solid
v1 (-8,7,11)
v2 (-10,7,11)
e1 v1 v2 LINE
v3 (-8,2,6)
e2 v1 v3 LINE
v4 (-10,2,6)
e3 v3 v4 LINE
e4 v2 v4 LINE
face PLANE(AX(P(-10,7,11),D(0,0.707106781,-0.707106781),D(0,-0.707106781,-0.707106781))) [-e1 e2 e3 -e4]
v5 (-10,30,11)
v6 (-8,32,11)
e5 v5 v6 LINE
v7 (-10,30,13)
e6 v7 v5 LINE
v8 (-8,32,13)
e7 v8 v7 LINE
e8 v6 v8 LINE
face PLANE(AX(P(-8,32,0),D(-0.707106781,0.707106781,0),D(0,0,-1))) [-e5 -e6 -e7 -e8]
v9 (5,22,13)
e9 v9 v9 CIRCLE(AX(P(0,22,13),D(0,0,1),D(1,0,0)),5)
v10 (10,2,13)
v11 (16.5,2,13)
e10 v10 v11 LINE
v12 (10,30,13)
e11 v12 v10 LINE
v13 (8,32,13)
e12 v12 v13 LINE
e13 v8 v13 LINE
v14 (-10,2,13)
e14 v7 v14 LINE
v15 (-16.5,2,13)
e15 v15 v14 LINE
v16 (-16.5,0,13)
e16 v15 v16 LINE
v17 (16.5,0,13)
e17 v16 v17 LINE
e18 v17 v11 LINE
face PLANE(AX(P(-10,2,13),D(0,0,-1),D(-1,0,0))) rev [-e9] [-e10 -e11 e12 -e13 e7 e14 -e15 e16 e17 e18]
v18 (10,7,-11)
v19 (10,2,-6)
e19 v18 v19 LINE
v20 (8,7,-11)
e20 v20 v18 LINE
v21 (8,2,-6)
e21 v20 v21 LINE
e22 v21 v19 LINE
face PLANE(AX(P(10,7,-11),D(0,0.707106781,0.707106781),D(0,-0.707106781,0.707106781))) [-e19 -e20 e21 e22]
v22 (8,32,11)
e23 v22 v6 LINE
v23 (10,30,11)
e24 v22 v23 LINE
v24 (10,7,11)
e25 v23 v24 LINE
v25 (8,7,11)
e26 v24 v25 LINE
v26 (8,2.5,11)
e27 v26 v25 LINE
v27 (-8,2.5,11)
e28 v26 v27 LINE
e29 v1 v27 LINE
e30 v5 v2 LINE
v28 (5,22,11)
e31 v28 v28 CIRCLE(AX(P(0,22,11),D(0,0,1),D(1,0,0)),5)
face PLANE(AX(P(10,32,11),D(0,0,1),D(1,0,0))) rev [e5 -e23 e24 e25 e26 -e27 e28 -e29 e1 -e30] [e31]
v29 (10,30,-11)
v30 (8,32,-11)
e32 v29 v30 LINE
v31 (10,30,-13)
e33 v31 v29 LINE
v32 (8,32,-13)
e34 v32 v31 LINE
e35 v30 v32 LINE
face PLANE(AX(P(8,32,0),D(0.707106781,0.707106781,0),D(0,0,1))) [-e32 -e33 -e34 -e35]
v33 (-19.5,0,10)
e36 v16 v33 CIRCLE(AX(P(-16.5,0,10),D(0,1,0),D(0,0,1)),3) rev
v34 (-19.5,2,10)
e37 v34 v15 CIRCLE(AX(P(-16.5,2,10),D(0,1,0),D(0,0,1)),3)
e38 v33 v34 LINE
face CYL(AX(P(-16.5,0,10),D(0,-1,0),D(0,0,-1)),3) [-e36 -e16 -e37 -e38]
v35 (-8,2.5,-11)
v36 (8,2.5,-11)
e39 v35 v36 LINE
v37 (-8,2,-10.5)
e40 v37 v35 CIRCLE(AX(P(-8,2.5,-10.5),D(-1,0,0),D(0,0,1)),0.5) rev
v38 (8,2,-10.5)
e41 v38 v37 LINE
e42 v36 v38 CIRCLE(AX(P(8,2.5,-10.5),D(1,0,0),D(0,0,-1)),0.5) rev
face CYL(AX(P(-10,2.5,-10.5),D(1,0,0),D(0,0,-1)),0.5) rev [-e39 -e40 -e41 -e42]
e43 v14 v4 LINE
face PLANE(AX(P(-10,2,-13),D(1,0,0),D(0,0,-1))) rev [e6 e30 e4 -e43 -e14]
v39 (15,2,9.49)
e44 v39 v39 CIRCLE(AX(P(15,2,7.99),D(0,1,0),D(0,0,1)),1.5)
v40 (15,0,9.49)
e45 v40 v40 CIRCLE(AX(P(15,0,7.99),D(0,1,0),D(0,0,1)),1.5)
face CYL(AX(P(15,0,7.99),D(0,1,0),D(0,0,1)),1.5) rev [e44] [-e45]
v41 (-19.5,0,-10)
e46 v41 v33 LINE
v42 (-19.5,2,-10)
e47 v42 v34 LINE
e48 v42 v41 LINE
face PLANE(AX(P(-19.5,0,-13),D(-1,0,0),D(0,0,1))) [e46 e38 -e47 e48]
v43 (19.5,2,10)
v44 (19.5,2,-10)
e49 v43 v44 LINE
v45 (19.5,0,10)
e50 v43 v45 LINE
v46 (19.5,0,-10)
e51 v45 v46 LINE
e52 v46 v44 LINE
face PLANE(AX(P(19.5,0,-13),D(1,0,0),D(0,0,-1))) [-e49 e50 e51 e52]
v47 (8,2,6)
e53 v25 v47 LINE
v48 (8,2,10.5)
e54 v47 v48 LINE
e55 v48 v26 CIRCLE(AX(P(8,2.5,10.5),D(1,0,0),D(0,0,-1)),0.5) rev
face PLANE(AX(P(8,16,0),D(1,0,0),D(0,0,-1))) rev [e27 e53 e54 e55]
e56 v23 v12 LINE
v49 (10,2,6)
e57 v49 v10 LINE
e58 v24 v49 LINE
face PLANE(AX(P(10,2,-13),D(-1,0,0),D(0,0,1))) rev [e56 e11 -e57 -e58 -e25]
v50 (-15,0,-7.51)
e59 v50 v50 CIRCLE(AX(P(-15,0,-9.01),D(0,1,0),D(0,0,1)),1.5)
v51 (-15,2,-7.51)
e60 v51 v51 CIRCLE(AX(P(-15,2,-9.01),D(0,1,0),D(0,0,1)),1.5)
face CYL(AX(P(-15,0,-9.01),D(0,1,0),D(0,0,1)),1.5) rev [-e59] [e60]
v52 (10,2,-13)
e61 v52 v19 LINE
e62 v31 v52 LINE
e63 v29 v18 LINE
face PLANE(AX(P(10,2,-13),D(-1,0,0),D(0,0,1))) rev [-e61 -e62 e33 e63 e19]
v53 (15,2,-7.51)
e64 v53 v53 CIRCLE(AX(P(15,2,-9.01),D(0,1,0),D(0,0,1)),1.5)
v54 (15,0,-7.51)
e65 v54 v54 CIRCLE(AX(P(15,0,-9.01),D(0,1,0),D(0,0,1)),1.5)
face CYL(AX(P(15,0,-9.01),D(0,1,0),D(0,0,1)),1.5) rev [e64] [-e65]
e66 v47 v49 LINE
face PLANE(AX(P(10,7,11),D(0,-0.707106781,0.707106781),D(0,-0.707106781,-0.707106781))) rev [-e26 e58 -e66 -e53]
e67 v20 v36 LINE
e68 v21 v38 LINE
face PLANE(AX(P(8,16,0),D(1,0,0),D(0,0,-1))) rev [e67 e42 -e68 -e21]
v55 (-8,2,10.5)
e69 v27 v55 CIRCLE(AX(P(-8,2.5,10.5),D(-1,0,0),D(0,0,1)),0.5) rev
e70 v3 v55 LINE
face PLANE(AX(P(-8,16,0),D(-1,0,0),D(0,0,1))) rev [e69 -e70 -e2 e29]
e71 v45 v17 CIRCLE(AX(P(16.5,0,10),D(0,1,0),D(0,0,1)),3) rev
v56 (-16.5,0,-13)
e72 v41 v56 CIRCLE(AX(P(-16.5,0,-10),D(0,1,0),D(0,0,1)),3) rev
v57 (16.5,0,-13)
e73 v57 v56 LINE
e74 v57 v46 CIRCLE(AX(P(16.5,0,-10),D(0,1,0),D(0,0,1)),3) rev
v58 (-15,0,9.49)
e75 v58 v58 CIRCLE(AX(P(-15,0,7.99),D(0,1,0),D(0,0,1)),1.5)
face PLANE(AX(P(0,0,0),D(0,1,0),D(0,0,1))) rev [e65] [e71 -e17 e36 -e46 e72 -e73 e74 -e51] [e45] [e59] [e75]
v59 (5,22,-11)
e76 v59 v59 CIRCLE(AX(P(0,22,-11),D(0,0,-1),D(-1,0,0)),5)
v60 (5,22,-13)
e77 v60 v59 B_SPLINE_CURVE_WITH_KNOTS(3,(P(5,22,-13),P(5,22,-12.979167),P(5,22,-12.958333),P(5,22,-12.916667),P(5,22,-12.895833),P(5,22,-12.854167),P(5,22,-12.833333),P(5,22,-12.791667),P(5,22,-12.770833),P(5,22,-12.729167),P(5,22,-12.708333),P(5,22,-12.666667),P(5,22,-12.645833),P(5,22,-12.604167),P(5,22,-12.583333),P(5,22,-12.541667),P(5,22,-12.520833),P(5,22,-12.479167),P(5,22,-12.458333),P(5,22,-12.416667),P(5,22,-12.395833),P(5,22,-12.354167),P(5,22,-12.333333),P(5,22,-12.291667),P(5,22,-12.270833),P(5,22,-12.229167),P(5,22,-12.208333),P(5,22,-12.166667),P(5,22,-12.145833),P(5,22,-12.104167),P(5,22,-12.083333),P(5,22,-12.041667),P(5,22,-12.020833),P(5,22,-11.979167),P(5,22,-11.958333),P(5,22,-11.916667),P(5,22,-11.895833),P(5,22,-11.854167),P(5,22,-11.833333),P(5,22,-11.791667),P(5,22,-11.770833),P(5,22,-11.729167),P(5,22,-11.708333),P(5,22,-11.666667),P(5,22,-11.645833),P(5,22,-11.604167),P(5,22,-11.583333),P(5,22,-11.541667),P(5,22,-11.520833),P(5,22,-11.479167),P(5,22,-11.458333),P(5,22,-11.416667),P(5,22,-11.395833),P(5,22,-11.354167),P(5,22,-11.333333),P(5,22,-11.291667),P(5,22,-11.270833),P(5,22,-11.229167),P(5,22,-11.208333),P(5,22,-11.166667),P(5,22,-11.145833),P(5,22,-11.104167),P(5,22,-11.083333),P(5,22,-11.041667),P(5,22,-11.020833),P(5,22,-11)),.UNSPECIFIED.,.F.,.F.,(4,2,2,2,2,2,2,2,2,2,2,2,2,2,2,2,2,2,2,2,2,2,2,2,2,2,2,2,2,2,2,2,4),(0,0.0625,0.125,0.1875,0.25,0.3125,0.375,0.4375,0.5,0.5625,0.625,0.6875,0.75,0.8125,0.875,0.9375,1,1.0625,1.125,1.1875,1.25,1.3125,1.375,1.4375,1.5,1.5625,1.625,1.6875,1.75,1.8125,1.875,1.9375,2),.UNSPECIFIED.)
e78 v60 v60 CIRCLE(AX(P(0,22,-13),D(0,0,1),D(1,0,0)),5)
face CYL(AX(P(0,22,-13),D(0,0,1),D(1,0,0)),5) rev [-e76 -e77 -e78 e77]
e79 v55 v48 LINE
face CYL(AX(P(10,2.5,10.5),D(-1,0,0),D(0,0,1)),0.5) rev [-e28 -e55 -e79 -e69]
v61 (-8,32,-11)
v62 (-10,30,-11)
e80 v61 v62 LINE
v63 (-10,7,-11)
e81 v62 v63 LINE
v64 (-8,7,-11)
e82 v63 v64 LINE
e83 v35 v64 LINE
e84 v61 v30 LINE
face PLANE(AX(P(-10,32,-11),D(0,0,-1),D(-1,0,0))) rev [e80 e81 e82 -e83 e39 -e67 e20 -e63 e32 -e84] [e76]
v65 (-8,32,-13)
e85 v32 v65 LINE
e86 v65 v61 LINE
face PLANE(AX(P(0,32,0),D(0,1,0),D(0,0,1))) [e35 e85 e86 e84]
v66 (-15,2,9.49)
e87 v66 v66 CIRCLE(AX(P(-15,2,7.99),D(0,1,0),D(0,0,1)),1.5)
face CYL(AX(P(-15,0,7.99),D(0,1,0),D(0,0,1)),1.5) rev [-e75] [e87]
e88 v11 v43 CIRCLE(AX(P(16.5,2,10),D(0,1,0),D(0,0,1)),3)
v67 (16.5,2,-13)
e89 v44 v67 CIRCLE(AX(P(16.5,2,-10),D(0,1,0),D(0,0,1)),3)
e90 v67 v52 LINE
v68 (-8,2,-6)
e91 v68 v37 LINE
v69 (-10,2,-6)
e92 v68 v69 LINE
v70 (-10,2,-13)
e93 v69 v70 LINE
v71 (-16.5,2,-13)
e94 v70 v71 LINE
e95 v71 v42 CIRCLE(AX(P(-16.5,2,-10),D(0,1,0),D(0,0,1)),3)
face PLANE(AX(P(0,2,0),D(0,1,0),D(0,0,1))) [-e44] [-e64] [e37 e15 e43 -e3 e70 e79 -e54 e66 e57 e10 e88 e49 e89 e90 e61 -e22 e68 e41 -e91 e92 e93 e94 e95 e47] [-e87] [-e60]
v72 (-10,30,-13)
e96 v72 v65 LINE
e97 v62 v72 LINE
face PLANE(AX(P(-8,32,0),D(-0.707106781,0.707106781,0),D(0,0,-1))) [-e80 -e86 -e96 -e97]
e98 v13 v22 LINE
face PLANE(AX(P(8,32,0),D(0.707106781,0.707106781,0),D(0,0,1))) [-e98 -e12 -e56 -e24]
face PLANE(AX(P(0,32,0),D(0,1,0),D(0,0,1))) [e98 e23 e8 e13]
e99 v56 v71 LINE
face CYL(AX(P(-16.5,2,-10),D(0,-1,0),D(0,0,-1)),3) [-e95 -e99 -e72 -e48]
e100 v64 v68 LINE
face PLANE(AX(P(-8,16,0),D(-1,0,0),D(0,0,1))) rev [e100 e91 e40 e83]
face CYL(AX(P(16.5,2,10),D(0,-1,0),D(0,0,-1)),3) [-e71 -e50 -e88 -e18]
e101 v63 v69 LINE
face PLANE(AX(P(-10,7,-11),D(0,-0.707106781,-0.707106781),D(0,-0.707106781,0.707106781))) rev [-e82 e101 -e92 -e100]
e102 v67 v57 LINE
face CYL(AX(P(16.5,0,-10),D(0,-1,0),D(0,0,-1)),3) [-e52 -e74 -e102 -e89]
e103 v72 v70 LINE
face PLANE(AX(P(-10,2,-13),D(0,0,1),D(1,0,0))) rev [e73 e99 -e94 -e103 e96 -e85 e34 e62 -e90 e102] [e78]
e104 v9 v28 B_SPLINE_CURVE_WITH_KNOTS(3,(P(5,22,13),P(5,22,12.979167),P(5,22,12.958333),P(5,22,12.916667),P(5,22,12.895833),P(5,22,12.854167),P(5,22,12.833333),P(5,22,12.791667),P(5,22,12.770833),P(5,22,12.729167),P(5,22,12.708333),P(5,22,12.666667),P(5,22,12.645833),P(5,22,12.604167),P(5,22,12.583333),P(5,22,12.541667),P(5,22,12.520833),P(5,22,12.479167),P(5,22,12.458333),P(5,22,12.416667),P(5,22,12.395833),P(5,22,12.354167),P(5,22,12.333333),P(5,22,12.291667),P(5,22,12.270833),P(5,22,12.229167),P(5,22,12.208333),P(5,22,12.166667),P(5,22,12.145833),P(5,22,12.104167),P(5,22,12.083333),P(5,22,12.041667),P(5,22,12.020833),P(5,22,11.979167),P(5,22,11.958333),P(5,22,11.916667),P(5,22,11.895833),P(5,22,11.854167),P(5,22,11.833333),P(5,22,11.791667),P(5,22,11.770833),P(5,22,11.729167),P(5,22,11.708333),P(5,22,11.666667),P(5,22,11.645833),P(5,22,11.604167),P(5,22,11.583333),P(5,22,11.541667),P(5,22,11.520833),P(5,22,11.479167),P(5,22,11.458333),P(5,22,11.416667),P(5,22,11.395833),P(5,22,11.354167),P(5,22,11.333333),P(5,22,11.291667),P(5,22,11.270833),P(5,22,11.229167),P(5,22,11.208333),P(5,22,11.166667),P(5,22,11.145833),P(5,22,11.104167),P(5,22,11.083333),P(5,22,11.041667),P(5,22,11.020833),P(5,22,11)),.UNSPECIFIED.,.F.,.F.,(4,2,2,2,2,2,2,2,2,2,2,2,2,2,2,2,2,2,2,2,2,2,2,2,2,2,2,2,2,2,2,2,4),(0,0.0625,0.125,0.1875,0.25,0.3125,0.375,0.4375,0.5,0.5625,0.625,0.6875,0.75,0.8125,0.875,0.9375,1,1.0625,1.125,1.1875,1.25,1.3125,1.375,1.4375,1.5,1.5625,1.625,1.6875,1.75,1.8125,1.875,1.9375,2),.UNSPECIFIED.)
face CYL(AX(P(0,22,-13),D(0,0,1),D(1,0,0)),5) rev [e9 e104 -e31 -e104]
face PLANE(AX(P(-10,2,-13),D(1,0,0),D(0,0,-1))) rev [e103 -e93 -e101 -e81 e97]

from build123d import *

# Parameters (mm, degrees)
SKETCH1_W            = 20
SKETCH1_H            = 26
BOSS_EXTRUDE1_DEPTH  = 2
SKETCH2_W            = 20
SKETCH2_H            = 2
BOSS_EXTRUDE2_DEPTH  = 30
SKETCH3_R            = 5
CUT_EXTRUDE1_DEPTH   = 43.426406871
SKETCH4_W            = 39
SKETCH4_H            = 26
BOSS_EXTRUDE3_DEPTH  = 2
SKETCH5_R            = 1.5
CUT_EXTRUDE2_DEPTH   = 39.069016273
FILLET1_R            = 3
CHAMFER1_SIZE        = 2
RIB3_START           = -2
RIB3_DEPTH           = 2
MIRROR2_START        = -2
MIRROR2_COPY_1_DEPTH = 2
FILLET2_R            = 0.5


# Read off the part's stored shape, not the designer's step: Rib3
with BuildPart() as part:
    # Sketch1 → Boss-Extrude1 (new body)
    with BuildSketch(Plane(origin=(0, 0, 0), x_dir=(1, 0, 0), z_dir=(0, 1, 0))):
        Rectangle(SKETCH1_W, SKETCH1_H)
    extrude(amount=BOSS_EXTRUDE1_DEPTH)

    # Sketch2 → Boss-Extrude2 (add)
    with BuildSketch(Plane(origin=(0, 2, 0), x_dir=(1, 0, 0), z_dir=(0, 1, 0))):
        with Locations((0, -12)):
            Rectangle(SKETCH2_W, SKETCH2_H)
        with Locations((0, 12)):
            Rectangle(SKETCH2_W, SKETCH2_H)
    extrude(amount=BOSS_EXTRUDE2_DEPTH)

    # Sketch3 → Cut-Extrude1 (cut, through all)
    with BuildSketch(Plane.XY.offset(13)):
        with Locations((0, 22)):
            Circle(SKETCH3_R)
    extrude(amount=-CUT_EXTRUDE1_DEPTH, mode=Mode.SUBTRACT)

    # Sketch4 → Boss-Extrude3 (add)
    with BuildSketch(Plane(origin=(0, 2, 0), x_dir=(1, 0, 0), z_dir=(0, 1, 0))):
        Rectangle(SKETCH4_W, SKETCH4_H)
    extrude(amount=-BOSS_EXTRUDE3_DEPTH)

    # Sketch5 → Cut-Extrude2 (cut, through all)
    with BuildSketch(Plane(origin=(0, 2, 0), x_dir=(1, 0, 0), z_dir=(0, 1, 0))):
        with Locations(Location((-15, 9.01, 0), (0, 0, 270))):
            Circle(SKETCH5_R)
        with Locations(Location((-15, -7.99, 0), (0, 0, 270))):
            Circle(SKETCH5_R)
        with Locations(Location((15, -7.99, 0), (0, 0, 270))):
            Circle(SKETCH5_R)
        with Locations(Location((15, 9.01, 0), (0, 0, 270))):
            Circle(SKETCH5_R)
    extrude(amount=-CUT_EXTRUDE2_DEPTH, mode=Mode.SUBTRACT)

    # Fillet1
    fillet1_edges = [part.edges().sort_by_distance(p)[0] for p in [
        (-19.5, 1, -13),
        (19.5, 1, 13),
        (-19.5, 1, 13),
        (19.5, 1, -13),
    ]]
    fillet(fillet1_edges, radius=FILLET1_R)

    # Chamfer1
    chamfer1_edges = [part.edges().sort_by_distance(p)[0] for p in [
        (10, 32, 12),
        (-10, 32, 12),
        (-10, 32, -12),
        (10, 32, -12),
    ]]
    chamfer(chamfer1_edges, length=CHAMFER1_SIZE)

    # Rib3 outline → Rib3 (add)
    with BuildSketch(Plane(origin=(10, 0, 0), x_dir=(0, 0, -1), z_dir=(1, 0, 0)).offset(RIB3_START)):
        Polygon((11, 2), (11, 7), (6, 2), align=None)
    rib3 = extrude(amount=RIB3_DEPTH)

    # Mirror1: Rib3 across plane
    add(rib3.mirror(Plane.XY))

    # Mirror2: Rib3 across plane
    add(rib3.mirror(Plane(origin=(0, 0, 0), x_dir=(0, 0, 1), z_dir=(1, 0, 0))))

    # Mirror2 copy 1 sketch → Mirror2 copy 1 (add)
    with BuildSketch(Plane.ZY.offset(10).offset(MIRROR2_START)):
        Polygon((11, 2), (11, 7), (6, 2), align=None)
    extrude(amount=MIRROR2_COPY_1_DEPTH)

    # Fillet2
    fillet2_edges = [part.edges().sort_by_distance(p)[0] for p in [
        (0, 2, 11),
        (0, 2, -11),
    ]]
    fillet(fillet2_edges, radius=FILLET2_R)


solid = part.part
